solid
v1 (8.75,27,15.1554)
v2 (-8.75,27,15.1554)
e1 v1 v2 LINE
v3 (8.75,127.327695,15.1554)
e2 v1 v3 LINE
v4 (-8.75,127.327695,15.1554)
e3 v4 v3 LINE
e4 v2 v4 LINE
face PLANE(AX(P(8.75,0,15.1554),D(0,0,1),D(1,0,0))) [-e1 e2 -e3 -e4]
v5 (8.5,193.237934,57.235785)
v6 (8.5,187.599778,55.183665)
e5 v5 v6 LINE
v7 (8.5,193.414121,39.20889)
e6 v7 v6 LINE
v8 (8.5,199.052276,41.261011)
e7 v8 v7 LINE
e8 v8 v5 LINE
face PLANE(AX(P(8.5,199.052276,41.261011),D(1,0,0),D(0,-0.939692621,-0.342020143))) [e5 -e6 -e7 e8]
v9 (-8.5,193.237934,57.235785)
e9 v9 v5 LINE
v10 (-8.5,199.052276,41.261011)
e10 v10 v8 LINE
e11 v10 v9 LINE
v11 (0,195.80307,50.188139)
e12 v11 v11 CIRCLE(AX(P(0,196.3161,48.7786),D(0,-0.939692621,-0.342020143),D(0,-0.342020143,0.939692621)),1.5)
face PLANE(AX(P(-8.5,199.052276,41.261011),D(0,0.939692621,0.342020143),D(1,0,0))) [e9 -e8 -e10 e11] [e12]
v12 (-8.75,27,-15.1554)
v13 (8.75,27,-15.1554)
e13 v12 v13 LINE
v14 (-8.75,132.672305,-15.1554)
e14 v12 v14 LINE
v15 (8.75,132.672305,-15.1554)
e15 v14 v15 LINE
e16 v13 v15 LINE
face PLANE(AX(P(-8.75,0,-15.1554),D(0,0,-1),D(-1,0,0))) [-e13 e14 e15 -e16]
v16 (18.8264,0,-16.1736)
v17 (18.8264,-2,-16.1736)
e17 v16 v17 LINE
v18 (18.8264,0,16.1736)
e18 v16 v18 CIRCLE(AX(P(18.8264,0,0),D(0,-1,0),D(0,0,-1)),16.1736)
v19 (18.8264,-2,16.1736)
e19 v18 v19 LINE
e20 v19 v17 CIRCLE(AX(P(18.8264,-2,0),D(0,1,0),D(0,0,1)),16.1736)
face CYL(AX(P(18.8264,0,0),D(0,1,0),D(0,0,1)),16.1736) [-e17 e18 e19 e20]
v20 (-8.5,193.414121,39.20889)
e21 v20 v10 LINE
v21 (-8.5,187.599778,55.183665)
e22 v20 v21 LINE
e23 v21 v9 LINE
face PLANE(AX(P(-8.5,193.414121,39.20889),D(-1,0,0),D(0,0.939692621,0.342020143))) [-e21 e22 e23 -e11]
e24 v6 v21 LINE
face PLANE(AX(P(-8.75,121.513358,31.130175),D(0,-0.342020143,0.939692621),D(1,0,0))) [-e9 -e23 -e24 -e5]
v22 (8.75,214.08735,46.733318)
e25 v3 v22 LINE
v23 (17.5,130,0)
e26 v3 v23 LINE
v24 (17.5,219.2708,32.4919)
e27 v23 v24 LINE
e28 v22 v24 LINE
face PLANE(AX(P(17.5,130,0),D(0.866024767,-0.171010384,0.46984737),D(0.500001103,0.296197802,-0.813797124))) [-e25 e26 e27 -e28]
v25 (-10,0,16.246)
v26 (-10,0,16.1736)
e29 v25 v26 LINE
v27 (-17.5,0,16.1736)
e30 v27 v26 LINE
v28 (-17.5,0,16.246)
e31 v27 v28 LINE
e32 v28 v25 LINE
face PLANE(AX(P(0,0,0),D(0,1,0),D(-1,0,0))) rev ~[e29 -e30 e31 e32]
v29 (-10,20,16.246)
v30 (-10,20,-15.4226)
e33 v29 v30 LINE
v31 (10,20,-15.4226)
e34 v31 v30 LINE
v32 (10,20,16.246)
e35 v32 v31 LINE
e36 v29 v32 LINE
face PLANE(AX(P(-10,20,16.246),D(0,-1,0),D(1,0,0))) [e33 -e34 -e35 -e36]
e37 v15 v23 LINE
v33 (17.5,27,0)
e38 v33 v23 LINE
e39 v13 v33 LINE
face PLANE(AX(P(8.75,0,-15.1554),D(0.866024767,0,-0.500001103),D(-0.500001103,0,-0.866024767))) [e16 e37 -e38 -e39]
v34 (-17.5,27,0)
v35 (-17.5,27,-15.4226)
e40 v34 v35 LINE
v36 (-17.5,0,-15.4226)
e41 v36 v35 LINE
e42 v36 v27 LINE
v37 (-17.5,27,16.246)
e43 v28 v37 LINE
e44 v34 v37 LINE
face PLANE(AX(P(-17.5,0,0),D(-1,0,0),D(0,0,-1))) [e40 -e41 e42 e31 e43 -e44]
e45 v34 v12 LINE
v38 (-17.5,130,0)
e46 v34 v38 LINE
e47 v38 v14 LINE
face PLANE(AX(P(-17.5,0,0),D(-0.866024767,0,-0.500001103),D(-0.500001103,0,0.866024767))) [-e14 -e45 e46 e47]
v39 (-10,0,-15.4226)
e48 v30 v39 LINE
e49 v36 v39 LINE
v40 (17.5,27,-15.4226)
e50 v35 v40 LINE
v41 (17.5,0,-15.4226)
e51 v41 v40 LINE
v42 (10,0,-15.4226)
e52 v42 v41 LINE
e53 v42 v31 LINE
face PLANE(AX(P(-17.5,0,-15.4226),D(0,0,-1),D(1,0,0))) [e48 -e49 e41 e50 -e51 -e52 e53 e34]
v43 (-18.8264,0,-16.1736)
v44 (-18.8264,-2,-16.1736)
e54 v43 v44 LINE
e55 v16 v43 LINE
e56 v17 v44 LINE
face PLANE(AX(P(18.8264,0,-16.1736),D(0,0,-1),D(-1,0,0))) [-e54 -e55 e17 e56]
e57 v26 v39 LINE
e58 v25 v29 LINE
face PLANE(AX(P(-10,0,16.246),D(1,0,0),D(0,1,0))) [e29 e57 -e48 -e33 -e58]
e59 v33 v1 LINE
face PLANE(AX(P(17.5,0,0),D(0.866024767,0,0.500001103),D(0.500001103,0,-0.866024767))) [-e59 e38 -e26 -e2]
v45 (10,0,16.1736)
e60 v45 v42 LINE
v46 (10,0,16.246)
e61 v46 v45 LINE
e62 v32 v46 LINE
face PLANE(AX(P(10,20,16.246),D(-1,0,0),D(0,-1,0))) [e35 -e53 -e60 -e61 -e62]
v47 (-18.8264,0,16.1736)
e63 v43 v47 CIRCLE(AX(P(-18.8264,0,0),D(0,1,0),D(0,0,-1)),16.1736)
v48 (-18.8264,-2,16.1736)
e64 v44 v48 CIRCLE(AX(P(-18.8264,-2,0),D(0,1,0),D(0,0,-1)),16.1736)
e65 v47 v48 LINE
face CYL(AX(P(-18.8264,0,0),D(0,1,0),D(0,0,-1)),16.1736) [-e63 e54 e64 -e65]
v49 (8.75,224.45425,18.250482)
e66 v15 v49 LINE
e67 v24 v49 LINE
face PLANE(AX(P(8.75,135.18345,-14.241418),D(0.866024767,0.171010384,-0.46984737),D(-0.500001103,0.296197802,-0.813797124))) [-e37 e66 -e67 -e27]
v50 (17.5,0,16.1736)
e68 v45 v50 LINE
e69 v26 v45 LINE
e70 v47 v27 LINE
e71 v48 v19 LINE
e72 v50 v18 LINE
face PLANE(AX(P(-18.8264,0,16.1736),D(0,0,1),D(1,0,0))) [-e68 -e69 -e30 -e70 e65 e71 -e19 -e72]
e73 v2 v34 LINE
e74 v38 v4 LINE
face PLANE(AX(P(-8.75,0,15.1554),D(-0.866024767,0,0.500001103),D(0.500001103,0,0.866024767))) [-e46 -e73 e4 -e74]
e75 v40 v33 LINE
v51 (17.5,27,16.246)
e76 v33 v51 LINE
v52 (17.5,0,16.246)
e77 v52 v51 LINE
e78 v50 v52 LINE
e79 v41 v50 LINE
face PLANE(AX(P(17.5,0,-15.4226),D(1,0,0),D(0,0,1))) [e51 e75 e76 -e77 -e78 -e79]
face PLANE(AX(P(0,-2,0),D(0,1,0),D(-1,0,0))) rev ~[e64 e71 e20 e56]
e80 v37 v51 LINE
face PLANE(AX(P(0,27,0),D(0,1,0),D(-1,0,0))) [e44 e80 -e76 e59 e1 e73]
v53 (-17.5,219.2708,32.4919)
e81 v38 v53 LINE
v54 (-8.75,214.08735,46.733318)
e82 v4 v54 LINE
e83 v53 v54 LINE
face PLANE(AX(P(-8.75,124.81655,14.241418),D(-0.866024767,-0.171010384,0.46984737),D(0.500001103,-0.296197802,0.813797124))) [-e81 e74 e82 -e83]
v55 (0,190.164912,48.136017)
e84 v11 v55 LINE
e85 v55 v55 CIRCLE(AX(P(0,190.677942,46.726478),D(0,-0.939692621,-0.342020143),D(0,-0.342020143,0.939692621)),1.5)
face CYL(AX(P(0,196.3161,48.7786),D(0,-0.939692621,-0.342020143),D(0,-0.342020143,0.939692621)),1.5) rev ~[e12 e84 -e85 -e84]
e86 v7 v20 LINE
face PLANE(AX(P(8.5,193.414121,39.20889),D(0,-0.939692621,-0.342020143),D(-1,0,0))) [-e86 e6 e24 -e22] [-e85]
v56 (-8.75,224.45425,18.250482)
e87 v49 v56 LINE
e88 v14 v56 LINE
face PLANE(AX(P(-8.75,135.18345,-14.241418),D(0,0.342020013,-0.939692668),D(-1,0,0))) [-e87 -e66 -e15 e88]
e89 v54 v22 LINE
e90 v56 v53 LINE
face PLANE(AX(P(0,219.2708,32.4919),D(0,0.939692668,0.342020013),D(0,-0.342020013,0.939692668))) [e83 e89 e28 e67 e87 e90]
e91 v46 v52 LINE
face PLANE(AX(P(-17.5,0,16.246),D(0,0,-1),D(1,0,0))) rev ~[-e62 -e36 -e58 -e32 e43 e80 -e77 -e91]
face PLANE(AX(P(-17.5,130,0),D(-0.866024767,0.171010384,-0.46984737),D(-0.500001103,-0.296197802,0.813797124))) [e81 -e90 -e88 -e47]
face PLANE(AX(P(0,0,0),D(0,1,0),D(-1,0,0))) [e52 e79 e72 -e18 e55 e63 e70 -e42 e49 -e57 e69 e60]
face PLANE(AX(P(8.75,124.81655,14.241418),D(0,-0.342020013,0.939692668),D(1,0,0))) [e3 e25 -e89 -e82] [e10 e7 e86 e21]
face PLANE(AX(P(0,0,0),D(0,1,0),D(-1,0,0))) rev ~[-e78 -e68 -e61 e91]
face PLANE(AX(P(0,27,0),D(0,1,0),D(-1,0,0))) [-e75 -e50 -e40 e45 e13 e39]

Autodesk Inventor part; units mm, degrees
sketch "Sketch1" plane through (0, 0, 0) normal (0, 1, 0) x (-1, 0, 0)
  line L0 (0, 0) -> (17.5, 0)
  line L1 (17.5, 0) -> (8.75, -15.1554)
  line L2 (8.75, -15.1554) -> (-8.75, -15.1554)
  line L3 (-8.75, -15.1554) -> (-17.5, 0)
  line L4 (-17.5, 0) -> (-8.75, 15.1554)
  line L5 (-8.75, 15.1554) -> (8.75, 15.1554)
  line L6 (8.75, 15.1554) -> (17.5, 0)
  dimension "d1" = 17.5
sketch "Sketch3" plane through (0, 0, 0) normal (1, 0, 0) x (0, 1, 0)
  line L0 (0, 0) -> (130, 0)
  line L1 (130, 0) -> (219.2708, 32.4919)
  dimension "d5" = 130
  dimension "d6" = 95
  dimension "d7" = 160
sweep "Sweep1" add profiles "Sketch1" path "Sketch3"
sketch "Sketch4" plane through (-8.75, 127.3277, 15.1554) normal (0, -0.3420201, 0.9396926) x (1, 0, 0)
  line L0 (0, 92.3277) -> (17.5, 92.3277) projected
  line L1 (8.75, 92.3277) -> (8.75, 76.3277)
  line L2 (8.75, 76.3277) -> (17.25, 76.3277)
  line L3 (17.5, 0) -> (17.5, 92.3277) projected
  line L4 (17.25, 76.3277) -> (17.25, 70.3277)
  line L5 (17.25, 70.3277) -> (0.25, 70.3277)
  line L6 (0, 0) -> (0, 92.3277) projected
  line L7 (0.25, 70.3277) -> (0.25, 76.3277)
  line L8 (0.25, 76.3277) -> (8.75, 76.3277)
  point P0 (8.75, -124.8324)
  dimension "d10" = 16
  dimension "d11" = 8.5
  dimension "d12" = 6
  dimension "d13" = 17
extrude "Extrusion1" add sketch "Sketch4" along normal blind 17
sketch "Sketch5" plane through (-8.5, 199.0522, 41.2611) normal (0, 0.9396926, 0.3420201) x (1, 0, 0)
  line L0 (17, 0) -> (0, 0) projected
  line L1 (8.5, 0) -> (8.5, -8)
  circle A0 centre (8.5, -8) radius 2.5
  point P0 (8.5, -29.3072)
  dimension "d16" = 8
  dimension "d17" = 5
hole "Hole1" at (0, 196.3161, 48.7786) direction (0, -0.9396926, -0.3420201) diameter 3 depth 10.077 tip angle 118
sketch "Sketch6" plane through (0, 0, 0) normal (0, 1, 0) x (-1, 0, 0)
  line L0 (17.5, 0) -> (8.75, 15.1554) projected
  line L1 (17.5, 0) -> (17.5, -15.4226)
  line L2 (17.5, -15.4226) -> (-17.5, -15.4226)
  line L3 (-17.5, -15.4226) -> (-17.5, 16.246)
  line L4 (-17.5, 0) -> (-17.5, 32.4919) projected
  line L5 (17.5, 0) -> (17.5, 32.4919) projected
  line L6 (17.5, 16.246) -> (-17.5, 16.246)
  line L7 (17.5, 16.246) -> (17.5, 0)
  point P0 (0, 0)
extrude "Extrusion2" add sketch "Sketch6" along normal blind 27
sketch "Sketch7" plane through (-17.5, 0, 16.246) normal (0, 0, 1) x (1, 0, 0)
  line L0 (17.5, 0) -> (7.5, 0)
  line L1 (35, 0) -> (0, 0) projected
  line L2 (7.5, 0) -> (27.5, 0)
  line L3 (7.5, 0) -> (7.5, 20)
  line L4 (7.5, 20) -> (27.5, 20)
  line L5 (27.5, 20) -> (27.5, 0)
  dimension "d27" = 10
  dimension "d28" = 20
  dimension "d29" = 20
extrude "Extrusion3" cut sketch "Sketch7" against normal blind 50
sketch "Sketch8" plane through (0, 0, 0) normal (0, 1, 0) x (-1, 0, 0)
  line L0 (0, 0) -> (-35, 0)
  line L1 (-35, 0) -> (35, 0) construction
  line L2 (-18.8264, -16.1736) -> (18.8264, -16.1736)
  line L3 (18.8264, 16.1736) -> (-18.8264, 16.1736)
  arc A0 (-18.8264, 16.1736) -> (-18.8264, -16.1736) centre (-18.8264, 0) ccw
  arc A1 (18.8264, -16.1736) -> (18.8264, 16.1736) centre (18.8264, 0) ccw
  dimension "d32" = 35
  dimension "d33" = 70
extrude "Extrusion4" add sketch "Sketch8" against normal blind 2
properties part number "Kamerahalter_II"
